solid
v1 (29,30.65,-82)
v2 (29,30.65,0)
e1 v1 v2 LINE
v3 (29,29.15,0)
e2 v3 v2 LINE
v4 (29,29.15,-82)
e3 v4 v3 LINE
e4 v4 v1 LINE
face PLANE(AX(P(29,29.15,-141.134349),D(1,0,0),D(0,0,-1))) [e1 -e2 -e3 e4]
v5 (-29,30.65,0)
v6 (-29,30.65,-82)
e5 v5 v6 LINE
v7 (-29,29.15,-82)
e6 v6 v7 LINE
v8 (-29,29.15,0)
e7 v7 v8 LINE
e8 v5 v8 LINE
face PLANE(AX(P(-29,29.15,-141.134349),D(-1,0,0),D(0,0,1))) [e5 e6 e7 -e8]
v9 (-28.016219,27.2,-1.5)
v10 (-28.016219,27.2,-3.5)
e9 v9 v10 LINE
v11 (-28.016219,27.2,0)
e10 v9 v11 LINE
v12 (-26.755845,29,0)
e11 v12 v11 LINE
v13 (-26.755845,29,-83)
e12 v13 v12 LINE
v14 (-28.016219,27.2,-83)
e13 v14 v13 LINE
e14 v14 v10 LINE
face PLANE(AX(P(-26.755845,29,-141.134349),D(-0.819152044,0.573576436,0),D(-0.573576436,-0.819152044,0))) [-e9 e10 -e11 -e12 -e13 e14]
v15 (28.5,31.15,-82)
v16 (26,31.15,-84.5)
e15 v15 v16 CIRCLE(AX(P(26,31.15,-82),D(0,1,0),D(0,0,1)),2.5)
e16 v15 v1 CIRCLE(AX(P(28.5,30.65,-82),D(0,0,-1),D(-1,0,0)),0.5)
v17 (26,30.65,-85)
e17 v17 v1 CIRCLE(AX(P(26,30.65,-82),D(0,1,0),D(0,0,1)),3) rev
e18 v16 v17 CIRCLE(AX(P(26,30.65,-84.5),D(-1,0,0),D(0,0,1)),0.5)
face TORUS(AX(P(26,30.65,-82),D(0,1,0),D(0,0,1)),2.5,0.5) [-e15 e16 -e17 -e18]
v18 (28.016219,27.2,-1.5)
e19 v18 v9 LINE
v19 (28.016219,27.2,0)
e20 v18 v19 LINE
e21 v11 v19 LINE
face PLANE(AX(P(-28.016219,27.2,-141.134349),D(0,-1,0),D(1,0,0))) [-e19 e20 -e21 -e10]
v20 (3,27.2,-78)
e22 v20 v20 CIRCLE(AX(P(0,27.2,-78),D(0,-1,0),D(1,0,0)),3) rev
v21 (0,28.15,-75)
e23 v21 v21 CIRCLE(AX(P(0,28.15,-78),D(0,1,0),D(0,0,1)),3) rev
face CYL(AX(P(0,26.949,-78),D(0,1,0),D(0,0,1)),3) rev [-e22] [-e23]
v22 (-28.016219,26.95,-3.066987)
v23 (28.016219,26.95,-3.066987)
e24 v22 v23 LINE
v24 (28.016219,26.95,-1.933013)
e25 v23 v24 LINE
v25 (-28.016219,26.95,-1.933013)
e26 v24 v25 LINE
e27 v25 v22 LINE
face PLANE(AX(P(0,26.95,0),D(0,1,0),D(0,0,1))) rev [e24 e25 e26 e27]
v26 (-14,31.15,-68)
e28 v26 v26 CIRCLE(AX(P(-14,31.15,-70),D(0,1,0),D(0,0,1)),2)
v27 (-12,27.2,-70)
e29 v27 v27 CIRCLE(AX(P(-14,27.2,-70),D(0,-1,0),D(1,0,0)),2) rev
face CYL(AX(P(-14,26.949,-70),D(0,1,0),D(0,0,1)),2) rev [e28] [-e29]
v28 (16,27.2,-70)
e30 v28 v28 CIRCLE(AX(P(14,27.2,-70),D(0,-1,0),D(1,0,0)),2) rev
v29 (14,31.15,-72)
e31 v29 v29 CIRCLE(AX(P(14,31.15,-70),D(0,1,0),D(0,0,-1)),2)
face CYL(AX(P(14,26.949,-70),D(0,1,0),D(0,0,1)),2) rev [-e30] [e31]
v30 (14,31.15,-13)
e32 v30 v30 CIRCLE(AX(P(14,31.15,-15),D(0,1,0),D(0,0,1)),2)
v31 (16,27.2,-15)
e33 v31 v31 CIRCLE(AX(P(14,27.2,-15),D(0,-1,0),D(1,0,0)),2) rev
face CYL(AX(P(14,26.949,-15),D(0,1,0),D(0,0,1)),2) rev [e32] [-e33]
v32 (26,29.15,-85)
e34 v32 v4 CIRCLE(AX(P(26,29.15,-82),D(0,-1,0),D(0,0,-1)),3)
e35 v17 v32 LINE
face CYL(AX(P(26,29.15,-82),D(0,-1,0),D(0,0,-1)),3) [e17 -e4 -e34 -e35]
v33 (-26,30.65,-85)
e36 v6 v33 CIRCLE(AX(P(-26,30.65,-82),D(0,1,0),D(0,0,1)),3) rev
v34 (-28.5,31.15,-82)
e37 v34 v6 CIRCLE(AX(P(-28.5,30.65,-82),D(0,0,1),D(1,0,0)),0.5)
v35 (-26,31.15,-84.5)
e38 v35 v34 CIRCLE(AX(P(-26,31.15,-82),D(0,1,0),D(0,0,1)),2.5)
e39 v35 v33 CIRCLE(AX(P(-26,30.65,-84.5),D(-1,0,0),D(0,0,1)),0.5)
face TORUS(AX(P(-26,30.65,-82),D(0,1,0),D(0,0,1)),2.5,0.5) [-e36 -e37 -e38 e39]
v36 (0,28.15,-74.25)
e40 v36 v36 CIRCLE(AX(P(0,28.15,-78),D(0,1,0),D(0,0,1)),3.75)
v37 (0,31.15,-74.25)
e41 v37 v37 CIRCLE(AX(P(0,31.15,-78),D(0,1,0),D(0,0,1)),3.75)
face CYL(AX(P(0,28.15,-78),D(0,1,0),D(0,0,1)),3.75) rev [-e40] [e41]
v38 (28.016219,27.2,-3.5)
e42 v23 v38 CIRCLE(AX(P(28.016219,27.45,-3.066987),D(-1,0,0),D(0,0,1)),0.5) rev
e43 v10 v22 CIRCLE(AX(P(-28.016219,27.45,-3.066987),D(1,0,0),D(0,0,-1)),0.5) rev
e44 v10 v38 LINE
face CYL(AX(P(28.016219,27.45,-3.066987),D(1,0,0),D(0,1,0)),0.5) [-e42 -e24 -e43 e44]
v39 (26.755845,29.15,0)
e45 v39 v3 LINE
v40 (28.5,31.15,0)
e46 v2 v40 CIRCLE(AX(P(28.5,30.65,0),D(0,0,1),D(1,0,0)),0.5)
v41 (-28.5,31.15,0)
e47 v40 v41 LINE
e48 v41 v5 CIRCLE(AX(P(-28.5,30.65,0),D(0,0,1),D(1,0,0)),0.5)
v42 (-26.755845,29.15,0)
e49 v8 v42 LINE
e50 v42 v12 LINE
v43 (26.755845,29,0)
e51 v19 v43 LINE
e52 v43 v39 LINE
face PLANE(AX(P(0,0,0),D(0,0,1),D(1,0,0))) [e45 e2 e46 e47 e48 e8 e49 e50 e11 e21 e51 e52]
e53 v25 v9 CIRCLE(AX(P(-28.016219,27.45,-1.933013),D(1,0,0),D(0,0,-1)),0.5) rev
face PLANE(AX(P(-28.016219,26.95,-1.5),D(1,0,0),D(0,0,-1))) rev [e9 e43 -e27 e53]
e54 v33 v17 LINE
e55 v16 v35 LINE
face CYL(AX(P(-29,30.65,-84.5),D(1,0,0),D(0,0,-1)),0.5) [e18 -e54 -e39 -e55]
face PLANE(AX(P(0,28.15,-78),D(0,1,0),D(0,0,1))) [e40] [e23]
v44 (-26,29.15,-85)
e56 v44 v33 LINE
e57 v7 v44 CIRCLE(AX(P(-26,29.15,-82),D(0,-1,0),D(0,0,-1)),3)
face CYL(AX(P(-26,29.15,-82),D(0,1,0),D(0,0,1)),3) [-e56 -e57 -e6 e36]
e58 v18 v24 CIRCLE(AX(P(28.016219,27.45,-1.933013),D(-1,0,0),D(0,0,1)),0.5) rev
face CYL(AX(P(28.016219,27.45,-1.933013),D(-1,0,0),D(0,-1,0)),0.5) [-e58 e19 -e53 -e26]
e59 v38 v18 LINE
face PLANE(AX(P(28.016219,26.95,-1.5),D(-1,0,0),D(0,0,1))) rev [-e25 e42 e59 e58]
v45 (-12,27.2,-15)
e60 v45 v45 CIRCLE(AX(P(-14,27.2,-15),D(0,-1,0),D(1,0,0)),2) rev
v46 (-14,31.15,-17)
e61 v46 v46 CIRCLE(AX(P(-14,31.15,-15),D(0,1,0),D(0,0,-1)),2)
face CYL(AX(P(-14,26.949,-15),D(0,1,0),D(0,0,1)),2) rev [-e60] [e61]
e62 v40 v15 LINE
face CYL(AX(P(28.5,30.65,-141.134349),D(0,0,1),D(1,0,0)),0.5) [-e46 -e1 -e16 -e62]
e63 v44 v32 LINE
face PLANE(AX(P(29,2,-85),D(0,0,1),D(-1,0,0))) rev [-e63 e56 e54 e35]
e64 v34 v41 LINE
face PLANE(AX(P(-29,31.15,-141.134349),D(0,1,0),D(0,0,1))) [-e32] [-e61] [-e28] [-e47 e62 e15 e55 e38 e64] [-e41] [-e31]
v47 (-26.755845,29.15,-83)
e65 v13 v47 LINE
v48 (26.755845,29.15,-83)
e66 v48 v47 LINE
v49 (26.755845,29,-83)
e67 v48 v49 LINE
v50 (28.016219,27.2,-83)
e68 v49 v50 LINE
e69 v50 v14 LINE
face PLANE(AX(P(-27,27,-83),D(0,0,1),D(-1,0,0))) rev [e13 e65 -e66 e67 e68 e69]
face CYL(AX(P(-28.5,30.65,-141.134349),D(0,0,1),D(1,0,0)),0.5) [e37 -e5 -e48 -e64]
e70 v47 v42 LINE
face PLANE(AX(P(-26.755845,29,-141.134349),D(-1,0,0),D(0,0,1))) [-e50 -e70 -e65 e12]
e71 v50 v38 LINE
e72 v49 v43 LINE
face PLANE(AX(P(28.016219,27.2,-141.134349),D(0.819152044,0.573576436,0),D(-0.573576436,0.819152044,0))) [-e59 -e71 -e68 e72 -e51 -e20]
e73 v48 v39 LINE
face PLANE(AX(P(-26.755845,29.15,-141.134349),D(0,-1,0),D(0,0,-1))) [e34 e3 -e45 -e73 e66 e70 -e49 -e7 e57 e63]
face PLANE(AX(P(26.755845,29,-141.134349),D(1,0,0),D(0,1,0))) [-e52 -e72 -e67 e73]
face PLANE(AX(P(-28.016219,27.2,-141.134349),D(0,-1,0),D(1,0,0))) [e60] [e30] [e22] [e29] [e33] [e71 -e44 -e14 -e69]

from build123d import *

# Parameters (mm, degrees)
BOSS_EXTRUDE1_DEPTH = 83
SKETCH3_W           = 58
SKETCH3_H           = 2
BOSS_EXTRUDE2_DEPTH = 2
FILLET1_R           = 3
SKETCH4_W           = 56.032437302
SKETCH4_H           = 2
BOSS_EXTRUDE3_DEPTH = 0.25
FILLET2_R           = 0.5
CUT_EXTRUDE1_REACH  = 91.909
SKETCH5_R           = 3
CUT_EXTRUDE2_REACH  = 91.909
SKETCH7_R           = 2
FILLET3_R           = 0.5
SKETCH8_R           = 3.75
CUT_EXTRUDE3_DEPTH  = 3


with BuildPart() as part:
    # Sketch1 → Boss-Extrude1 (new body)
    with BuildSketch(Plane.XY):
        Polygon((-26.755845082, 29), (-28.016218651, 27.2), (28.016218651, 27.2), (26.755845082, 29), (26.755845082, 29.15), (29, 29.15), (29, 31.15), (-29, 31.15), (-29, 29.15), (-26.755845082, 29.15), align=None)
    extrude(amount=-BOSS_EXTRUDE1_DEPTH)

    # Sketch3 → Boss-Extrude2 (add)
    with BuildSketch(Plane(origin=(0, 0, -83), x_dir=(-1, 0, 0), z_dir=(0, 0, -1))):
        with Locations((0, 30.15)):
            Rectangle(SKETCH3_W, SKETCH3_H)
    extrude(amount=BOSS_EXTRUDE2_DEPTH)

    # Fillet1
    fillet1_edges = [part.edges().sort_by_distance(p)[0] for p in [
        (-29, 30.15, -85),
        (29, 30.15, -85),
    ]]
    fillet(fillet1_edges, radius=FILLET1_R)

    # Sketch4 → Boss-Extrude3 (add)
    with BuildSketch(Plane.XZ.offset(-27.2)):
        with Locations((0, -2.5)):
            Rectangle(SKETCH4_W, SKETCH4_H)
    extrude(amount=BOSS_EXTRUDE3_DEPTH)

    # Fillet2
    # the kernel refuses this fillet: 0.5 mm, written as the material it takes off along each edge
    with BuildSketch(Plane(origin=(-29.098750406, 26.95, -3.5), x_dir=(0, 1, 0), z_dir=(1, 0, 0)), Plane(origin=(29.098750406, 26.95, -1.5), x_dir=(0, 1, 0), z_dir=(-1, 0, 0))) as fillet2_piece_1:
        with BuildLine():
            CenterArc((0.5, 0.433012702), FILLET2_R, 180, 60)
            Line((0, 0.433012702), (-0.01, 0.433012702))
            Line((-0.01, 0.433012702), (-0.01, 0))
            Line((-0.01, 0), (0, -0.01))
            ThreePointArc((0, -0.01), (0.125, -0.01), (0.245, -0.008660254))
            Line((0.245, -0.008660254), (0.25, 0))
        make_face()
    extrude(amount=58.197500812, mode=Mode.SUBTRACT)

    # Sketch5 → Cut-Extrude1 (cut, up to next)
    with BuildSketch(Plane(origin=(0, 31.15, 0), x_dir=(1, 0, 0), z_dir=(0, 1, 0)), mode=Mode.PRIVATE) as cut_extrude1_sk1:
        with Locations(Location((0, 78, 0), (0, 0, 270))):
            Circle(SKETCH5_R)
    cut_extrude1_tool1 = extrude(cut_extrude1_sk1.sketch, amount=-CUT_EXTRUDE1_REACH, mode=Mode.PRIVATE) & part.part
    add(cut_extrude1_tool1.solids().sort_by_distance((0, 31.15, -78))[0], mode=Mode.SUBTRACT)

    # Sketch7 → Cut-Extrude2 (cut, up to next)
    with BuildSketch(Plane(origin=(0, 31.15, 0), x_dir=(1, 0, 0), z_dir=(0, 1, 0)), mode=Mode.PRIVATE) as cut_extrude2_sk1:
        with Locations(Location((14, 15, 0), (0, 0, 270))):
            Circle(SKETCH7_R)
    cut_extrude2_tool1 = extrude(cut_extrude2_sk1.sketch, amount=-CUT_EXTRUDE2_REACH, mode=Mode.PRIVATE) & part.part
    # Sketch7 → Cut-Extrude2 (cut, up to next)
    with BuildSketch(Plane(origin=(0, 31.15, 0), x_dir=(1, 0, 0), z_dir=(0, 1, 0)), mode=Mode.PRIVATE) as cut_extrude2_sk2:
        with Locations((14, 70)):
            Circle(SKETCH7_R)
    cut_extrude2_tool2 = extrude(cut_extrude2_sk2.sketch, amount=-CUT_EXTRUDE2_REACH, mode=Mode.PRIVATE) & part.part
    # Sketch7 → Cut-Extrude2 (cut, up to next)
    with BuildSketch(Plane(origin=(0, 31.15, 0), x_dir=(1, 0, 0), z_dir=(0, 1, 0)), mode=Mode.PRIVATE) as cut_extrude2_sk3:
        with Locations(Location((-14, 70, 0), (0, 0, 270))):
            Circle(SKETCH7_R)
    cut_extrude2_tool3 = extrude(cut_extrude2_sk3.sketch, amount=-CUT_EXTRUDE2_REACH, mode=Mode.PRIVATE) & part.part
    # Sketch7 → Cut-Extrude2 (cut, up to next)
    with BuildSketch(Plane(origin=(0, 31.15, 0), x_dir=(1, 0, 0), z_dir=(0, 1, 0)), mode=Mode.PRIVATE) as cut_extrude2_sk4:
        with Locations((-14, 15)):
            Circle(SKETCH7_R)
    cut_extrude2_tool4 = extrude(cut_extrude2_sk4.sketch, amount=-CUT_EXTRUDE2_REACH, mode=Mode.PRIVATE) & part.part
    add(cut_extrude2_tool1.solids().sort_by_distance((14, 31.15, -15))[0], mode=Mode.SUBTRACT)
    add(cut_extrude2_tool2.solids().sort_by_distance((14, 31.15, -70))[0], mode=Mode.SUBTRACT)
    add(cut_extrude2_tool3.solids().sort_by_distance((-14, 31.15, -70))[0], mode=Mode.SUBTRACT)
    add(cut_extrude2_tool4.solids().sort_by_distance((-14, 31.15, -15))[0], mode=Mode.SUBTRACT)

    # Fillet3
    fillet3_edges = [part.edges().sort_by_distance(p)[0] for p in [
        (29, 31.15, -41),
        (0, 31.15, -85),
        (-29, 31.15, -41),
        (-28.121320344, 31.15, -84.121320344),
        (28.121320344, 31.15, -84.121320344),
    ]]
    fillet(fillet3_edges, radius=FILLET3_R)

    # Sketch8 → Cut-Extrude3 (cut)
    with BuildSketch(Plane(origin=(0, 31.15, 0), x_dir=(1, 0, 0), z_dir=(0, 1, 0))):
        with Locations(Location((0, 78, 0), (0, 0, 270))):
            Circle(SKETCH8_R)
    extrude(amount=-CUT_EXTRUDE3_DEPTH, mode=Mode.SUBTRACT)


solid = part.part
